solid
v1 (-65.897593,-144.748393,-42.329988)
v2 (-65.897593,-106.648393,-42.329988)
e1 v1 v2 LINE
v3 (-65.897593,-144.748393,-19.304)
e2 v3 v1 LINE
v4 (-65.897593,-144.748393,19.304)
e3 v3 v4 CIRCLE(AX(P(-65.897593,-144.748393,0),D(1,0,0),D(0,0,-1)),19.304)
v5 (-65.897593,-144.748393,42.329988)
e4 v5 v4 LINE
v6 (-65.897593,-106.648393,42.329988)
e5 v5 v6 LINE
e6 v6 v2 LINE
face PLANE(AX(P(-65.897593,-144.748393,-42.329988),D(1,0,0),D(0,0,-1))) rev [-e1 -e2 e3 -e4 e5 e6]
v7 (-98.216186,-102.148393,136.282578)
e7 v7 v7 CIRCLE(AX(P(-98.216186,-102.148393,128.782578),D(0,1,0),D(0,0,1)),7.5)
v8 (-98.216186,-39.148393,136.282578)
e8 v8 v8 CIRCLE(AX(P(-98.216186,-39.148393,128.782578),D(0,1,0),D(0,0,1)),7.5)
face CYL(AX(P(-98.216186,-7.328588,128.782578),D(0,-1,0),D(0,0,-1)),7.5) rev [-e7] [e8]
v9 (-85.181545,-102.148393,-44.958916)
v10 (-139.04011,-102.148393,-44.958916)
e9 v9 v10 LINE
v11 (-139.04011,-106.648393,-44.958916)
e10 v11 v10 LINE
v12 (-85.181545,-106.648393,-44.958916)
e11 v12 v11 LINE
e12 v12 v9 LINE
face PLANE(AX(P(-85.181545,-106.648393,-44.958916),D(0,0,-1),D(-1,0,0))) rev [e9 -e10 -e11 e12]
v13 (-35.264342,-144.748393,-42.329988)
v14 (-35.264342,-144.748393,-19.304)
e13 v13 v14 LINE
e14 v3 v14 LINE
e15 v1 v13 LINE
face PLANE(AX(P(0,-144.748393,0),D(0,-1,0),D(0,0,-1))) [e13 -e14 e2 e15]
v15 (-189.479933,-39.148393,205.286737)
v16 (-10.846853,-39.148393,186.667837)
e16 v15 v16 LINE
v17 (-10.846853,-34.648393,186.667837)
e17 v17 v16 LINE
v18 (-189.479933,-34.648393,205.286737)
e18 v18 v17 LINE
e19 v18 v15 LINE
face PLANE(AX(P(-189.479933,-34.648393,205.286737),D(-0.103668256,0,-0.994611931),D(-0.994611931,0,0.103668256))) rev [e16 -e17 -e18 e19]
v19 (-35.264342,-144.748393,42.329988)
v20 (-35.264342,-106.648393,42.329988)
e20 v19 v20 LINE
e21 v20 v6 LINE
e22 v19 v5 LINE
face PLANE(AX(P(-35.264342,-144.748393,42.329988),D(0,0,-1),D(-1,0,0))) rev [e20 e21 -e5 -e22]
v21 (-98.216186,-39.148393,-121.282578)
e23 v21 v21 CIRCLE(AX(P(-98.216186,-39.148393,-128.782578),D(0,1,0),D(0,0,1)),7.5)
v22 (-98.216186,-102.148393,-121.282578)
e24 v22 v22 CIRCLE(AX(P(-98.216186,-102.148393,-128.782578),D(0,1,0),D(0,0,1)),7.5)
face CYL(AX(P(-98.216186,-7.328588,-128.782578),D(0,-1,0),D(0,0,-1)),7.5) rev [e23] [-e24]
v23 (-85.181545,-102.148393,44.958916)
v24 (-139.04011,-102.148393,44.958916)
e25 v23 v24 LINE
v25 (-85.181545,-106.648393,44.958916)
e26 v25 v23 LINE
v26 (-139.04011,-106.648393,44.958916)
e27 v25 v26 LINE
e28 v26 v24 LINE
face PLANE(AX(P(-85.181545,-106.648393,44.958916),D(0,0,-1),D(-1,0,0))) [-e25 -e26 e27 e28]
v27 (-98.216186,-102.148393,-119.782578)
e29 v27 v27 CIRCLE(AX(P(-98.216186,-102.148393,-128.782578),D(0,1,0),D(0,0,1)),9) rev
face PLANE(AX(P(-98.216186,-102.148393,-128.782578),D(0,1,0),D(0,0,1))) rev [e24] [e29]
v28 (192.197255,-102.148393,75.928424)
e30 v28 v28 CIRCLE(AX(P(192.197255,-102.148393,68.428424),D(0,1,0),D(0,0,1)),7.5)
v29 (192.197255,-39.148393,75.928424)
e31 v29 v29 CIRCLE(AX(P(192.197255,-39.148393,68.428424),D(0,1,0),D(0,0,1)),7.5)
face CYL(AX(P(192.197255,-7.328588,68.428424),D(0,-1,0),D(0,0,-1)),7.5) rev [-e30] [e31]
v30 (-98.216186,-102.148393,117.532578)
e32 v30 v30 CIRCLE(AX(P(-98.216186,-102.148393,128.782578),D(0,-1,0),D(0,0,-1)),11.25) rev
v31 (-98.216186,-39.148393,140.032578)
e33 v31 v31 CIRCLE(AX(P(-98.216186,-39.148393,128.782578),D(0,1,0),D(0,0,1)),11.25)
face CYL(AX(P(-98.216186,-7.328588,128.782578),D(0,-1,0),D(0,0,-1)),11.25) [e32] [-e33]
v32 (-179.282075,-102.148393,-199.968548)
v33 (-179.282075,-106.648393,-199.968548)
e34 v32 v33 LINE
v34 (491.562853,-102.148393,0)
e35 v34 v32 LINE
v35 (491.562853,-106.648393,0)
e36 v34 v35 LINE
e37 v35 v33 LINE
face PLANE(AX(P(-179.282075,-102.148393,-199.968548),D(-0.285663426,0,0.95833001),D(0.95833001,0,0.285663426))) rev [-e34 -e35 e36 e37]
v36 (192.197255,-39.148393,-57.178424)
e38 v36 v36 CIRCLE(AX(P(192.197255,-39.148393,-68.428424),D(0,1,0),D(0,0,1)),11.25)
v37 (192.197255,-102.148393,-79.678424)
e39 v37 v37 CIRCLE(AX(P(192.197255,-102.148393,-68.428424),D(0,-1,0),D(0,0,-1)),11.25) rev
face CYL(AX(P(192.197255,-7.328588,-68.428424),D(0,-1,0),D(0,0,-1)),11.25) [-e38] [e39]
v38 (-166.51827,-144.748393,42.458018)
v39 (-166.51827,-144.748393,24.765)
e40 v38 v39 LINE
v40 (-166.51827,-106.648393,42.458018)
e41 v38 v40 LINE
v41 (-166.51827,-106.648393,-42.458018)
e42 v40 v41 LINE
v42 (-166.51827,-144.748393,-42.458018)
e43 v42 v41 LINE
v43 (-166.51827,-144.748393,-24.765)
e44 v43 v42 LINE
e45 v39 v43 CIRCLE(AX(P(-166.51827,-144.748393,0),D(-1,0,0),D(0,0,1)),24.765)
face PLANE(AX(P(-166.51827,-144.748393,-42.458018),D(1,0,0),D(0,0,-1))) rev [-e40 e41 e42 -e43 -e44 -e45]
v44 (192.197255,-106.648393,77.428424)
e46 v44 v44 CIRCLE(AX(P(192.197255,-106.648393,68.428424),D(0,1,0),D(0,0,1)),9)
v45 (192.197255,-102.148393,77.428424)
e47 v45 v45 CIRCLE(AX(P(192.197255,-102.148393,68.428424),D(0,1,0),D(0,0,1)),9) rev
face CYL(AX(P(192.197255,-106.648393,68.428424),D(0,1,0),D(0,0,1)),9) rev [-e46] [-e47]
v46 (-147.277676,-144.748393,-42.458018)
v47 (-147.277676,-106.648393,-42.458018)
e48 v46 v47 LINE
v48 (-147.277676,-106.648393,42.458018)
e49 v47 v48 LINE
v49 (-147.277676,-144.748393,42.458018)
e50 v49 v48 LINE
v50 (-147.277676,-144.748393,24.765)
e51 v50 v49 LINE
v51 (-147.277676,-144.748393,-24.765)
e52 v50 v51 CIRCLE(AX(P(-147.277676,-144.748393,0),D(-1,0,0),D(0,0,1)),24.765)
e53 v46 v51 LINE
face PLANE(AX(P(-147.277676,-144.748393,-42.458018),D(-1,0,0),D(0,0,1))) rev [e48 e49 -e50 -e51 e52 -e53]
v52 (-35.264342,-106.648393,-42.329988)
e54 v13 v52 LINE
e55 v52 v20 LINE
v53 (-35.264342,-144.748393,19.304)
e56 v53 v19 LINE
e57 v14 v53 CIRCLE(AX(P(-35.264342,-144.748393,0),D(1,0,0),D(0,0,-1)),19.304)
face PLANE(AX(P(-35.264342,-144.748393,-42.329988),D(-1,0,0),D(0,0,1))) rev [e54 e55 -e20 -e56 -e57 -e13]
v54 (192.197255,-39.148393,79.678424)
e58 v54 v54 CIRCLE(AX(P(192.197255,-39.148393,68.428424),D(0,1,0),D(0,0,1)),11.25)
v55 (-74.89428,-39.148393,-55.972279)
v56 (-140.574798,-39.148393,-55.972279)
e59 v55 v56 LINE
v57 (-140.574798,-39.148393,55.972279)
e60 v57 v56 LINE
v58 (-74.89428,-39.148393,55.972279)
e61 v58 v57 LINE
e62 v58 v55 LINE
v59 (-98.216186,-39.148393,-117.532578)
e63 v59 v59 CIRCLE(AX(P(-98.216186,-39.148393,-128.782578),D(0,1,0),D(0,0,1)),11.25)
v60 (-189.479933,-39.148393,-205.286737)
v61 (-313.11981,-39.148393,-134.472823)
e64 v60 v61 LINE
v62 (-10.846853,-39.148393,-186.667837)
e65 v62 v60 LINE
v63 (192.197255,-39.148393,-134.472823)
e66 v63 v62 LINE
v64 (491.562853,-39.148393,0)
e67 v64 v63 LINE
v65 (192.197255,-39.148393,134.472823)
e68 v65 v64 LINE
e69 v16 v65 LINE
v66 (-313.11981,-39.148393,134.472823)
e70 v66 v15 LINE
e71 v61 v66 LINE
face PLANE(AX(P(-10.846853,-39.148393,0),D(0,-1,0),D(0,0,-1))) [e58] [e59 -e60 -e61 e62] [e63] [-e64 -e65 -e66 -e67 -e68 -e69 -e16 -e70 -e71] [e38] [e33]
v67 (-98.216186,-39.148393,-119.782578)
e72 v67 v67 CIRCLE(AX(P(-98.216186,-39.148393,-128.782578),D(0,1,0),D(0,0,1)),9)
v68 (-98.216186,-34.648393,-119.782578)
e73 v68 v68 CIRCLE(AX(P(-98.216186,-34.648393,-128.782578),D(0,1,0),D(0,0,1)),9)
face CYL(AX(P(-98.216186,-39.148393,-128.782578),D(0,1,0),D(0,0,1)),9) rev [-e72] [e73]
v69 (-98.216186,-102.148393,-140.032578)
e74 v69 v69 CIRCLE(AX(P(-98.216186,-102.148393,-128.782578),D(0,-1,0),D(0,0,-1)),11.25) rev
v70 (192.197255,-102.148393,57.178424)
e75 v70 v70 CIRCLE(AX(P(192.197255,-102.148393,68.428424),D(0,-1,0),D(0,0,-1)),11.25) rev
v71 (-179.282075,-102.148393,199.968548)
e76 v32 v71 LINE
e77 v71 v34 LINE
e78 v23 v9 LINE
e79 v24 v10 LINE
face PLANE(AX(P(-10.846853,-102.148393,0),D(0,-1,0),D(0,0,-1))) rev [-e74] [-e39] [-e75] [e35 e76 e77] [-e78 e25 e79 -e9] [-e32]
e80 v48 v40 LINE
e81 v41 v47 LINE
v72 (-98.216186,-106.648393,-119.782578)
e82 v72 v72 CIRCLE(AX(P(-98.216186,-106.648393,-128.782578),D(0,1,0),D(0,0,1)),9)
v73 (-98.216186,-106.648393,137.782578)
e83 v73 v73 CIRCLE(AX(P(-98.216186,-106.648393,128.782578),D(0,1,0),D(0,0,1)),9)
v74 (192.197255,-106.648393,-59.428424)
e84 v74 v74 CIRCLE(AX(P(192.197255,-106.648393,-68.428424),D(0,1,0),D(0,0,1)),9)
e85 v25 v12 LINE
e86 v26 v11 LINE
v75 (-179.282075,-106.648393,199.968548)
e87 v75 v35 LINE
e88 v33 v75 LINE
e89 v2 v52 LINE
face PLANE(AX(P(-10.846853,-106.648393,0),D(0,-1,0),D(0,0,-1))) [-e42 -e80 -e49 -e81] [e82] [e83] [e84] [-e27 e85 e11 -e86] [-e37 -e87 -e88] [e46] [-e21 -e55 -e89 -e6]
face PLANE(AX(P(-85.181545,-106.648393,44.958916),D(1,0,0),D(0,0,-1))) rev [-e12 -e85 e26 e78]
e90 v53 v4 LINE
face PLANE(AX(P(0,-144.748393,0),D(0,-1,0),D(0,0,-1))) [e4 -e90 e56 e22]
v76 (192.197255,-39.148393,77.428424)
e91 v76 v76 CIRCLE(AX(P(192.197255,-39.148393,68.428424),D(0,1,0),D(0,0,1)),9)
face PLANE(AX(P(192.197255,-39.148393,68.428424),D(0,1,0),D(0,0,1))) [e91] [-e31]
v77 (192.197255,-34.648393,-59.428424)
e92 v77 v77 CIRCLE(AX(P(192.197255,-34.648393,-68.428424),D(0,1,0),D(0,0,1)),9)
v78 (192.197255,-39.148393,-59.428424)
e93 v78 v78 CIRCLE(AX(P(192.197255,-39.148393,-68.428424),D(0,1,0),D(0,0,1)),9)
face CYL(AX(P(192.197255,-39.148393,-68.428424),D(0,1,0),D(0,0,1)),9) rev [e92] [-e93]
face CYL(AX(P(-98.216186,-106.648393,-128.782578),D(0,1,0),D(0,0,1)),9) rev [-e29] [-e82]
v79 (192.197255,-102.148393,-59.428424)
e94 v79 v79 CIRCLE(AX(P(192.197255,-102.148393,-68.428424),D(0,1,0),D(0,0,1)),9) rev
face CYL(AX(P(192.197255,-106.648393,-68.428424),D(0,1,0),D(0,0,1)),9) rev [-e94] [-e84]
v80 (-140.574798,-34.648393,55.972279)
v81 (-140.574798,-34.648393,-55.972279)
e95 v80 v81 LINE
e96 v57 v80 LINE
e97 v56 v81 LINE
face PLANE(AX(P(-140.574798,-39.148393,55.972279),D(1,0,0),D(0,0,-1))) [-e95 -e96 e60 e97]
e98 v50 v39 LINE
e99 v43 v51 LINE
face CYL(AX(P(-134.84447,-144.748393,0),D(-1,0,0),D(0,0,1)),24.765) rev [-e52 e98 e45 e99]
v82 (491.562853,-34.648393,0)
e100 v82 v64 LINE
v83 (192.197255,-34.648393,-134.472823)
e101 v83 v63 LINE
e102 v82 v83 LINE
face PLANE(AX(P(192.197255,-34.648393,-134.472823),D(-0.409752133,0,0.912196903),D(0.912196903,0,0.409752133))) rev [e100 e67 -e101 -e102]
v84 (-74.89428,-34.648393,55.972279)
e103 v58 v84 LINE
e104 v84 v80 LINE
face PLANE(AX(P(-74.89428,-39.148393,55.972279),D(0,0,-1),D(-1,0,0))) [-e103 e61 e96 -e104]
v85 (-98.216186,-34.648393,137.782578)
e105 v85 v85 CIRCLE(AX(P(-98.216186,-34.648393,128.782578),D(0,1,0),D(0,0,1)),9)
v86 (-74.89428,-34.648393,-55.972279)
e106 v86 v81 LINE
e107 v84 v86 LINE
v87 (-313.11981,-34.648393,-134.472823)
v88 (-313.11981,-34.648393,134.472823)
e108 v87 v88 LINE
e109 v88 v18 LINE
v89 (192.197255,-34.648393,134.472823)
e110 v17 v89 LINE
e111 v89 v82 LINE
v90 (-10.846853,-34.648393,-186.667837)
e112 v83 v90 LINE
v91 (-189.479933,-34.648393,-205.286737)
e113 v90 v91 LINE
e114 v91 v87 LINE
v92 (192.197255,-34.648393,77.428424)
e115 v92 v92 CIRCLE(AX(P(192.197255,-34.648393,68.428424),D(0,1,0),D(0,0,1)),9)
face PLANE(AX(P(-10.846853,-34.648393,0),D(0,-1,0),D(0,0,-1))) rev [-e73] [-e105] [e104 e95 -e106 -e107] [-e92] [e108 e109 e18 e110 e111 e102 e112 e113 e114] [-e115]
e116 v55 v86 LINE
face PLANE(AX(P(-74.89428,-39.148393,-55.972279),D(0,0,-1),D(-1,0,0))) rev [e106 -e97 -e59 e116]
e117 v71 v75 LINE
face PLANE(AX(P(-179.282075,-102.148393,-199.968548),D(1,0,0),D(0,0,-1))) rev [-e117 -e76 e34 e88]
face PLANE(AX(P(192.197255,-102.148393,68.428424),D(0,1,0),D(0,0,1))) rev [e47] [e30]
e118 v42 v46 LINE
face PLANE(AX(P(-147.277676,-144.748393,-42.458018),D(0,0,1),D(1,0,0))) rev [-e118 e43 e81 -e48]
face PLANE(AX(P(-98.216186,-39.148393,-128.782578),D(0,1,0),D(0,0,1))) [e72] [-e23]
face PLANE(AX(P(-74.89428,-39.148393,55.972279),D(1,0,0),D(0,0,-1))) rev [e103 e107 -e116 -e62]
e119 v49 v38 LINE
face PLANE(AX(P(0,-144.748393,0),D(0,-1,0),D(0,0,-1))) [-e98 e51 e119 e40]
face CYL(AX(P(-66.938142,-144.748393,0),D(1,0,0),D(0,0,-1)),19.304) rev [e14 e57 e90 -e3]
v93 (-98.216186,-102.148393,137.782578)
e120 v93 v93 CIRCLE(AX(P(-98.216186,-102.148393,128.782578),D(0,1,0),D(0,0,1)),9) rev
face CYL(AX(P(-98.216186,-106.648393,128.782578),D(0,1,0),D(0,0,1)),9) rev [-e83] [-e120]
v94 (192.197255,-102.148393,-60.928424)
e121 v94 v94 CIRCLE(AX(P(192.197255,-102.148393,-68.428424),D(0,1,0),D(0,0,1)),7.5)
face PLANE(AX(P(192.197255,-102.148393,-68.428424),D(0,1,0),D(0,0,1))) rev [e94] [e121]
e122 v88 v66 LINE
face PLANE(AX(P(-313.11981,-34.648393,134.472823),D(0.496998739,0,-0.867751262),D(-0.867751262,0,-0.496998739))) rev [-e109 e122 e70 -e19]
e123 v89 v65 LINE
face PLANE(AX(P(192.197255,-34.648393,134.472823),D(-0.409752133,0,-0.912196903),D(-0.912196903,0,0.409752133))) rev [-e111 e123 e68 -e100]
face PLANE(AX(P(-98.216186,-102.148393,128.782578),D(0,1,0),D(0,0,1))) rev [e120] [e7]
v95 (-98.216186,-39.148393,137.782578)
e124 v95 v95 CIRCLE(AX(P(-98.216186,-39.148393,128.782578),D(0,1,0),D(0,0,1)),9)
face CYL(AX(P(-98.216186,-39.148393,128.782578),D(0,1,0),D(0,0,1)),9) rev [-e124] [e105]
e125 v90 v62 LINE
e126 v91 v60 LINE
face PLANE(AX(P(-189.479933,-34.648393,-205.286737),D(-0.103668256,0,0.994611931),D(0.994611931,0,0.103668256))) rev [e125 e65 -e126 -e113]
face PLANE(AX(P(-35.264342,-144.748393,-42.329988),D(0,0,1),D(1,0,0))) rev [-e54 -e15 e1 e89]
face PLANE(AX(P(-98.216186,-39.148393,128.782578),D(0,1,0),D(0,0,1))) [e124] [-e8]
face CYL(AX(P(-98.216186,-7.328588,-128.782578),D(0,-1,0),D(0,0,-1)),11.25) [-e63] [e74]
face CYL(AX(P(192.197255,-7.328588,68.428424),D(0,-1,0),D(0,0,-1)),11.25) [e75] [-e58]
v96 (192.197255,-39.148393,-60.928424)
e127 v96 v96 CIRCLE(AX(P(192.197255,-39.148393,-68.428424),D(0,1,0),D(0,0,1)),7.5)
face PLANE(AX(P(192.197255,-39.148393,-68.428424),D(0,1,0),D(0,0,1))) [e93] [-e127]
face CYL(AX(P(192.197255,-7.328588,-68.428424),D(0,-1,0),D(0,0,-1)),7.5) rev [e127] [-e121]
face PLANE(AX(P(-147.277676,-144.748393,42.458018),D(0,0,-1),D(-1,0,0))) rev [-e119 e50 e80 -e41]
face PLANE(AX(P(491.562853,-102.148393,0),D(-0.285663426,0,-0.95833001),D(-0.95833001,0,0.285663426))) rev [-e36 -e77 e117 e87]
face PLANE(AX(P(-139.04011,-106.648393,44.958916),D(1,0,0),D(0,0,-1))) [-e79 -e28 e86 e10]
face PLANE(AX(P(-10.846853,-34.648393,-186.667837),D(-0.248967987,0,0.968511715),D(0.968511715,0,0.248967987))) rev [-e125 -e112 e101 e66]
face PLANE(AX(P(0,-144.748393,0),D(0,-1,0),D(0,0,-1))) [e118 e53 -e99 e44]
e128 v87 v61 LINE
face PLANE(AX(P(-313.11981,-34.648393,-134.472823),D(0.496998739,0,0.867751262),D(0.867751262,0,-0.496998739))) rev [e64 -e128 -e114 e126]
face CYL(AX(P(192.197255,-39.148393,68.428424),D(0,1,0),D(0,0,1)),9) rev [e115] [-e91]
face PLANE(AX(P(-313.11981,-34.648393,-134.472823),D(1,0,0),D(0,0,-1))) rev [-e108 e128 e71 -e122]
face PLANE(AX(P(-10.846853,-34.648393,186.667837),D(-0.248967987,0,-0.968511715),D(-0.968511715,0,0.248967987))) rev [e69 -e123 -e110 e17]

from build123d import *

# Parameters (mm, degrees)
STOCK_BODY2_2_1_START         = -47.04864598
STOCK_BODY2_2_1_OUTLINE_W     = 43.787012176
STOCK_BODY2_2_1_OUTLINE_H     = 74.629705784
STOCK_BODY2_2_1_OUTLINE_R     = 6
STOCK_BODY2_2_1_DEPTH         = 3
STOCK_BODY2_2_1_START_2       = -92.04864598
STOCK_BODY2_2_1_2_OUTLINE_R   = 6
STOCK_BODY2_2_1_2_OUTLINE_W   = 35.905709945
STOCK_BODY2_2_1_2_OUTLINE_H   = 59.945220798
STOCK_BODY2_2_1_2_DEPTH       = 3
STOCK_BODY2_2_1_START_3       = -89.04864598
STOCK_BODY2_2_1_3_OUTLINE_R   = 7.5
STOCK_BODY2_2_1_3_OUTLINE_R_2 = 5
STOCK_BODY2_2_1_3_DEPTH       = 42
SCALE1_SCALE                  = 1.5
SKETCH2_W                     = 19.240593306
SKETCH2_H                     = 84.91603611
BOSS_EXTRUDE1_DEPTH           = 38.1
SKETCH3_W                     = 30.633251364
SKETCH3_H                     = 84.659976372
BOSS_EXTRUDE2_DEPTH           = 38.1
SKETCH4_R                     = 19.304
CUT_EXTRUDE2_DEPTH            = 31.6738
SKETCH5_R                     = 24.765
CUT_EXTRUDE3_DEPTH            = 31.6738


# Read off the part's stored shape, not the designer's step: Stock-Body2.2-1
with BuildPart() as part:
    # Stock-Body2.2-1 outline → Stock-Body2.2-1 (new body)
    with BuildSketch(Plane(origin=(0, 0, 0), x_dir=(1, 0, 0), z_dir=(0, 1, 0)).offset(STOCK_BODY2_2_1_START)):
        Polygon((135.362738013, -89.648548647), (334.939803936, 0), (135.362738013, 89.648548647), (0, 124.445224737), (-119.088720056, 136.857824586), (-201.515305017, 89.648548647), (-201.515305017, -89.648548647), (-119.088720056, -136.857824586), (0, -124.445224737), align=None)
        with Locations((-64.591790786, 0)):
            Rectangle(STOCK_BODY2_2_1_OUTLINE_W, STOCK_BODY2_2_1_OUTLINE_H, mode=Mode.SUBTRACT)
        with Locations((-58.24622251, -85.855051723)):
            Circle(STOCK_BODY2_2_1_OUTLINE_R, mode=Mode.SUBTRACT)
        with Locations((135.362738013, -45.618949287)):
            Circle(STOCK_BODY2_2_1_OUTLINE_R, mode=Mode.SUBTRACT)
        with Locations((-58.24622251, 85.855051723)):
            Circle(STOCK_BODY2_2_1_OUTLINE_R, mode=Mode.SUBTRACT)
        with Locations((135.362738013, 45.618949287)):
            Circle(STOCK_BODY2_2_1_OUTLINE_R, mode=Mode.SUBTRACT)
    extrude(amount=STOCK_BODY2_2_1_DEPTH)



with BuildPart() as body_2:
    # Stock-Body2.2-1 2 outline → Stock-Body2.2-1 2 (new body)
    with BuildSketch(Plane(origin=(0, 0, 0), x_dir=(1, 0, 0), z_dir=(0, 1, 0)).offset(STOCK_BODY2_2_1_START_2)):
        Polygon((-112.290148162, -133.312365233), (334.939803936, 0), (-112.290148162, 133.312365233), align=None)
        with Locations((-58.24622251, -85.855051723)):
            Circle(STOCK_BODY2_2_1_2_OUTLINE_R, mode=Mode.SUBTRACT)
        with Locations((135.362738013, -45.618949287)):
            Circle(STOCK_BODY2_2_1_2_OUTLINE_R, mode=Mode.SUBTRACT)
        with Locations((-67.509316896, 0)):
            Rectangle(STOCK_BODY2_2_1_2_OUTLINE_W, STOCK_BODY2_2_1_2_OUTLINE_H, mode=Mode.SUBTRACT)
        with Locations((-58.24622251, 85.855051723)):
            Circle(STOCK_BODY2_2_1_2_OUTLINE_R, mode=Mode.SUBTRACT)
        with Locations((135.362738013, 45.618949287)):
            Circle(STOCK_BODY2_2_1_2_OUTLINE_R, mode=Mode.SUBTRACT)
    extrude(amount=STOCK_BODY2_2_1_2_DEPTH)


with BuildPart() as part_1:
    add(part.part)

    add(body_2.part)  # Stock-Body2.2-1 3 merges body 2
    # Stock-Body2.2-1 3 outline → Stock-Body2.2-1 3 (add)
    # profile 1 of 4: a face of its own
    with BuildSketch(Plane(origin=(0, 0, 0), x_dir=(1, 0, 0), z_dir=(0, 1, 0)).offset(STOCK_BODY2_2_1_START_3)):
        with Locations((135.362738013, -45.618949287)):
            Circle(STOCK_BODY2_2_1_3_OUTLINE_R)
        with Locations((135.362738013, -45.618949287)):
            Circle(STOCK_BODY2_2_1_3_OUTLINE_R_2, mode=Mode.SUBTRACT)
    # profile 2 of 4: a face of its own
    with BuildSketch(Plane(origin=(0, 0, 0), x_dir=(1, 0, 0), z_dir=(0, 1, 0)).offset(STOCK_BODY2_2_1_START_3)):
        with Locations((-58.24622251, 85.855051723)):
            Circle(STOCK_BODY2_2_1_3_OUTLINE_R)
        with Locations((-58.24622251, 85.855051723)):
            Circle(STOCK_BODY2_2_1_3_OUTLINE_R_2, mode=Mode.SUBTRACT)
    # profile 3 of 4: a face of its own
    with BuildSketch(Plane(origin=(0, 0, 0), x_dir=(1, 0, 0), z_dir=(0, 1, 0)).offset(STOCK_BODY2_2_1_START_3)):
        with Locations((135.362738013, 45.618949287)):
            Circle(STOCK_BODY2_2_1_3_OUTLINE_R)
        with Locations((135.362738013, 45.618949287)):
            Circle(STOCK_BODY2_2_1_3_OUTLINE_R_2, mode=Mode.SUBTRACT)
    # profile 4 of 4: a face of its own
    with BuildSketch(Plane(origin=(0, 0, 0), x_dir=(1, 0, 0), z_dir=(0, 1, 0)).offset(STOCK_BODY2_2_1_START_3)):
        with Locations((-58.24622251, -85.855051723)):
            Circle(STOCK_BODY2_2_1_3_OUTLINE_R)
        with Locations((-58.24622251, -85.855051723)):
            Circle(STOCK_BODY2_2_1_3_OUTLINE_R_2, mode=Mode.SUBTRACT)
    extrude(amount=STOCK_BODY2_2_1_3_DEPTH)


with BuildPart() as part_2:
    # Scale1: scaled about (21.693705028, -62.849152598, 0)
    add(part_1.part.scale(SCALE1_SCALE).moved(Location((-10.846852514, 31.424576299, 0))))

    # Sketch2 → Boss-Extrude1 (add)
    with BuildSketch(Plane.XZ.offset(106.648392671)):
        with Locations((-156.897972987, 0)):
            Rectangle(SKETCH2_W, SKETCH2_H)
    extrude(amount=BOSS_EXTRUDE1_DEPTH)

    # Sketch3 → Boss-Extrude2 (add)
    with BuildSketch(Plane.XZ.offset(106.648392671)):
        with Locations((-50.580967258, 0)):
            Rectangle(SKETCH3_W, SKETCH3_H)
    extrude(amount=BOSS_EXTRUDE2_DEPTH)

    # Sketch4 → Cut-Extrude2 (cut)
    with BuildSketch(Plane(origin=(-35.264341576, 0, 0), x_dir=(0, 0, -1), z_dir=(1, 0, 0))):
        with Locations((0, -144.748392671)):
            Circle(SKETCH4_R)
    extrude(amount=-CUT_EXTRUDE2_DEPTH, mode=Mode.SUBTRACT)

    # Sketch5 → Cut-Extrude3 (cut)
    with BuildSketch(Plane.ZY.offset(166.51826964)):
        with Locations((0, -144.748392671)):
            Circle(SKETCH5_R)
    extrude(amount=-CUT_EXTRUDE3_DEPTH, mode=Mode.SUBTRACT)


solid = part_2.part
